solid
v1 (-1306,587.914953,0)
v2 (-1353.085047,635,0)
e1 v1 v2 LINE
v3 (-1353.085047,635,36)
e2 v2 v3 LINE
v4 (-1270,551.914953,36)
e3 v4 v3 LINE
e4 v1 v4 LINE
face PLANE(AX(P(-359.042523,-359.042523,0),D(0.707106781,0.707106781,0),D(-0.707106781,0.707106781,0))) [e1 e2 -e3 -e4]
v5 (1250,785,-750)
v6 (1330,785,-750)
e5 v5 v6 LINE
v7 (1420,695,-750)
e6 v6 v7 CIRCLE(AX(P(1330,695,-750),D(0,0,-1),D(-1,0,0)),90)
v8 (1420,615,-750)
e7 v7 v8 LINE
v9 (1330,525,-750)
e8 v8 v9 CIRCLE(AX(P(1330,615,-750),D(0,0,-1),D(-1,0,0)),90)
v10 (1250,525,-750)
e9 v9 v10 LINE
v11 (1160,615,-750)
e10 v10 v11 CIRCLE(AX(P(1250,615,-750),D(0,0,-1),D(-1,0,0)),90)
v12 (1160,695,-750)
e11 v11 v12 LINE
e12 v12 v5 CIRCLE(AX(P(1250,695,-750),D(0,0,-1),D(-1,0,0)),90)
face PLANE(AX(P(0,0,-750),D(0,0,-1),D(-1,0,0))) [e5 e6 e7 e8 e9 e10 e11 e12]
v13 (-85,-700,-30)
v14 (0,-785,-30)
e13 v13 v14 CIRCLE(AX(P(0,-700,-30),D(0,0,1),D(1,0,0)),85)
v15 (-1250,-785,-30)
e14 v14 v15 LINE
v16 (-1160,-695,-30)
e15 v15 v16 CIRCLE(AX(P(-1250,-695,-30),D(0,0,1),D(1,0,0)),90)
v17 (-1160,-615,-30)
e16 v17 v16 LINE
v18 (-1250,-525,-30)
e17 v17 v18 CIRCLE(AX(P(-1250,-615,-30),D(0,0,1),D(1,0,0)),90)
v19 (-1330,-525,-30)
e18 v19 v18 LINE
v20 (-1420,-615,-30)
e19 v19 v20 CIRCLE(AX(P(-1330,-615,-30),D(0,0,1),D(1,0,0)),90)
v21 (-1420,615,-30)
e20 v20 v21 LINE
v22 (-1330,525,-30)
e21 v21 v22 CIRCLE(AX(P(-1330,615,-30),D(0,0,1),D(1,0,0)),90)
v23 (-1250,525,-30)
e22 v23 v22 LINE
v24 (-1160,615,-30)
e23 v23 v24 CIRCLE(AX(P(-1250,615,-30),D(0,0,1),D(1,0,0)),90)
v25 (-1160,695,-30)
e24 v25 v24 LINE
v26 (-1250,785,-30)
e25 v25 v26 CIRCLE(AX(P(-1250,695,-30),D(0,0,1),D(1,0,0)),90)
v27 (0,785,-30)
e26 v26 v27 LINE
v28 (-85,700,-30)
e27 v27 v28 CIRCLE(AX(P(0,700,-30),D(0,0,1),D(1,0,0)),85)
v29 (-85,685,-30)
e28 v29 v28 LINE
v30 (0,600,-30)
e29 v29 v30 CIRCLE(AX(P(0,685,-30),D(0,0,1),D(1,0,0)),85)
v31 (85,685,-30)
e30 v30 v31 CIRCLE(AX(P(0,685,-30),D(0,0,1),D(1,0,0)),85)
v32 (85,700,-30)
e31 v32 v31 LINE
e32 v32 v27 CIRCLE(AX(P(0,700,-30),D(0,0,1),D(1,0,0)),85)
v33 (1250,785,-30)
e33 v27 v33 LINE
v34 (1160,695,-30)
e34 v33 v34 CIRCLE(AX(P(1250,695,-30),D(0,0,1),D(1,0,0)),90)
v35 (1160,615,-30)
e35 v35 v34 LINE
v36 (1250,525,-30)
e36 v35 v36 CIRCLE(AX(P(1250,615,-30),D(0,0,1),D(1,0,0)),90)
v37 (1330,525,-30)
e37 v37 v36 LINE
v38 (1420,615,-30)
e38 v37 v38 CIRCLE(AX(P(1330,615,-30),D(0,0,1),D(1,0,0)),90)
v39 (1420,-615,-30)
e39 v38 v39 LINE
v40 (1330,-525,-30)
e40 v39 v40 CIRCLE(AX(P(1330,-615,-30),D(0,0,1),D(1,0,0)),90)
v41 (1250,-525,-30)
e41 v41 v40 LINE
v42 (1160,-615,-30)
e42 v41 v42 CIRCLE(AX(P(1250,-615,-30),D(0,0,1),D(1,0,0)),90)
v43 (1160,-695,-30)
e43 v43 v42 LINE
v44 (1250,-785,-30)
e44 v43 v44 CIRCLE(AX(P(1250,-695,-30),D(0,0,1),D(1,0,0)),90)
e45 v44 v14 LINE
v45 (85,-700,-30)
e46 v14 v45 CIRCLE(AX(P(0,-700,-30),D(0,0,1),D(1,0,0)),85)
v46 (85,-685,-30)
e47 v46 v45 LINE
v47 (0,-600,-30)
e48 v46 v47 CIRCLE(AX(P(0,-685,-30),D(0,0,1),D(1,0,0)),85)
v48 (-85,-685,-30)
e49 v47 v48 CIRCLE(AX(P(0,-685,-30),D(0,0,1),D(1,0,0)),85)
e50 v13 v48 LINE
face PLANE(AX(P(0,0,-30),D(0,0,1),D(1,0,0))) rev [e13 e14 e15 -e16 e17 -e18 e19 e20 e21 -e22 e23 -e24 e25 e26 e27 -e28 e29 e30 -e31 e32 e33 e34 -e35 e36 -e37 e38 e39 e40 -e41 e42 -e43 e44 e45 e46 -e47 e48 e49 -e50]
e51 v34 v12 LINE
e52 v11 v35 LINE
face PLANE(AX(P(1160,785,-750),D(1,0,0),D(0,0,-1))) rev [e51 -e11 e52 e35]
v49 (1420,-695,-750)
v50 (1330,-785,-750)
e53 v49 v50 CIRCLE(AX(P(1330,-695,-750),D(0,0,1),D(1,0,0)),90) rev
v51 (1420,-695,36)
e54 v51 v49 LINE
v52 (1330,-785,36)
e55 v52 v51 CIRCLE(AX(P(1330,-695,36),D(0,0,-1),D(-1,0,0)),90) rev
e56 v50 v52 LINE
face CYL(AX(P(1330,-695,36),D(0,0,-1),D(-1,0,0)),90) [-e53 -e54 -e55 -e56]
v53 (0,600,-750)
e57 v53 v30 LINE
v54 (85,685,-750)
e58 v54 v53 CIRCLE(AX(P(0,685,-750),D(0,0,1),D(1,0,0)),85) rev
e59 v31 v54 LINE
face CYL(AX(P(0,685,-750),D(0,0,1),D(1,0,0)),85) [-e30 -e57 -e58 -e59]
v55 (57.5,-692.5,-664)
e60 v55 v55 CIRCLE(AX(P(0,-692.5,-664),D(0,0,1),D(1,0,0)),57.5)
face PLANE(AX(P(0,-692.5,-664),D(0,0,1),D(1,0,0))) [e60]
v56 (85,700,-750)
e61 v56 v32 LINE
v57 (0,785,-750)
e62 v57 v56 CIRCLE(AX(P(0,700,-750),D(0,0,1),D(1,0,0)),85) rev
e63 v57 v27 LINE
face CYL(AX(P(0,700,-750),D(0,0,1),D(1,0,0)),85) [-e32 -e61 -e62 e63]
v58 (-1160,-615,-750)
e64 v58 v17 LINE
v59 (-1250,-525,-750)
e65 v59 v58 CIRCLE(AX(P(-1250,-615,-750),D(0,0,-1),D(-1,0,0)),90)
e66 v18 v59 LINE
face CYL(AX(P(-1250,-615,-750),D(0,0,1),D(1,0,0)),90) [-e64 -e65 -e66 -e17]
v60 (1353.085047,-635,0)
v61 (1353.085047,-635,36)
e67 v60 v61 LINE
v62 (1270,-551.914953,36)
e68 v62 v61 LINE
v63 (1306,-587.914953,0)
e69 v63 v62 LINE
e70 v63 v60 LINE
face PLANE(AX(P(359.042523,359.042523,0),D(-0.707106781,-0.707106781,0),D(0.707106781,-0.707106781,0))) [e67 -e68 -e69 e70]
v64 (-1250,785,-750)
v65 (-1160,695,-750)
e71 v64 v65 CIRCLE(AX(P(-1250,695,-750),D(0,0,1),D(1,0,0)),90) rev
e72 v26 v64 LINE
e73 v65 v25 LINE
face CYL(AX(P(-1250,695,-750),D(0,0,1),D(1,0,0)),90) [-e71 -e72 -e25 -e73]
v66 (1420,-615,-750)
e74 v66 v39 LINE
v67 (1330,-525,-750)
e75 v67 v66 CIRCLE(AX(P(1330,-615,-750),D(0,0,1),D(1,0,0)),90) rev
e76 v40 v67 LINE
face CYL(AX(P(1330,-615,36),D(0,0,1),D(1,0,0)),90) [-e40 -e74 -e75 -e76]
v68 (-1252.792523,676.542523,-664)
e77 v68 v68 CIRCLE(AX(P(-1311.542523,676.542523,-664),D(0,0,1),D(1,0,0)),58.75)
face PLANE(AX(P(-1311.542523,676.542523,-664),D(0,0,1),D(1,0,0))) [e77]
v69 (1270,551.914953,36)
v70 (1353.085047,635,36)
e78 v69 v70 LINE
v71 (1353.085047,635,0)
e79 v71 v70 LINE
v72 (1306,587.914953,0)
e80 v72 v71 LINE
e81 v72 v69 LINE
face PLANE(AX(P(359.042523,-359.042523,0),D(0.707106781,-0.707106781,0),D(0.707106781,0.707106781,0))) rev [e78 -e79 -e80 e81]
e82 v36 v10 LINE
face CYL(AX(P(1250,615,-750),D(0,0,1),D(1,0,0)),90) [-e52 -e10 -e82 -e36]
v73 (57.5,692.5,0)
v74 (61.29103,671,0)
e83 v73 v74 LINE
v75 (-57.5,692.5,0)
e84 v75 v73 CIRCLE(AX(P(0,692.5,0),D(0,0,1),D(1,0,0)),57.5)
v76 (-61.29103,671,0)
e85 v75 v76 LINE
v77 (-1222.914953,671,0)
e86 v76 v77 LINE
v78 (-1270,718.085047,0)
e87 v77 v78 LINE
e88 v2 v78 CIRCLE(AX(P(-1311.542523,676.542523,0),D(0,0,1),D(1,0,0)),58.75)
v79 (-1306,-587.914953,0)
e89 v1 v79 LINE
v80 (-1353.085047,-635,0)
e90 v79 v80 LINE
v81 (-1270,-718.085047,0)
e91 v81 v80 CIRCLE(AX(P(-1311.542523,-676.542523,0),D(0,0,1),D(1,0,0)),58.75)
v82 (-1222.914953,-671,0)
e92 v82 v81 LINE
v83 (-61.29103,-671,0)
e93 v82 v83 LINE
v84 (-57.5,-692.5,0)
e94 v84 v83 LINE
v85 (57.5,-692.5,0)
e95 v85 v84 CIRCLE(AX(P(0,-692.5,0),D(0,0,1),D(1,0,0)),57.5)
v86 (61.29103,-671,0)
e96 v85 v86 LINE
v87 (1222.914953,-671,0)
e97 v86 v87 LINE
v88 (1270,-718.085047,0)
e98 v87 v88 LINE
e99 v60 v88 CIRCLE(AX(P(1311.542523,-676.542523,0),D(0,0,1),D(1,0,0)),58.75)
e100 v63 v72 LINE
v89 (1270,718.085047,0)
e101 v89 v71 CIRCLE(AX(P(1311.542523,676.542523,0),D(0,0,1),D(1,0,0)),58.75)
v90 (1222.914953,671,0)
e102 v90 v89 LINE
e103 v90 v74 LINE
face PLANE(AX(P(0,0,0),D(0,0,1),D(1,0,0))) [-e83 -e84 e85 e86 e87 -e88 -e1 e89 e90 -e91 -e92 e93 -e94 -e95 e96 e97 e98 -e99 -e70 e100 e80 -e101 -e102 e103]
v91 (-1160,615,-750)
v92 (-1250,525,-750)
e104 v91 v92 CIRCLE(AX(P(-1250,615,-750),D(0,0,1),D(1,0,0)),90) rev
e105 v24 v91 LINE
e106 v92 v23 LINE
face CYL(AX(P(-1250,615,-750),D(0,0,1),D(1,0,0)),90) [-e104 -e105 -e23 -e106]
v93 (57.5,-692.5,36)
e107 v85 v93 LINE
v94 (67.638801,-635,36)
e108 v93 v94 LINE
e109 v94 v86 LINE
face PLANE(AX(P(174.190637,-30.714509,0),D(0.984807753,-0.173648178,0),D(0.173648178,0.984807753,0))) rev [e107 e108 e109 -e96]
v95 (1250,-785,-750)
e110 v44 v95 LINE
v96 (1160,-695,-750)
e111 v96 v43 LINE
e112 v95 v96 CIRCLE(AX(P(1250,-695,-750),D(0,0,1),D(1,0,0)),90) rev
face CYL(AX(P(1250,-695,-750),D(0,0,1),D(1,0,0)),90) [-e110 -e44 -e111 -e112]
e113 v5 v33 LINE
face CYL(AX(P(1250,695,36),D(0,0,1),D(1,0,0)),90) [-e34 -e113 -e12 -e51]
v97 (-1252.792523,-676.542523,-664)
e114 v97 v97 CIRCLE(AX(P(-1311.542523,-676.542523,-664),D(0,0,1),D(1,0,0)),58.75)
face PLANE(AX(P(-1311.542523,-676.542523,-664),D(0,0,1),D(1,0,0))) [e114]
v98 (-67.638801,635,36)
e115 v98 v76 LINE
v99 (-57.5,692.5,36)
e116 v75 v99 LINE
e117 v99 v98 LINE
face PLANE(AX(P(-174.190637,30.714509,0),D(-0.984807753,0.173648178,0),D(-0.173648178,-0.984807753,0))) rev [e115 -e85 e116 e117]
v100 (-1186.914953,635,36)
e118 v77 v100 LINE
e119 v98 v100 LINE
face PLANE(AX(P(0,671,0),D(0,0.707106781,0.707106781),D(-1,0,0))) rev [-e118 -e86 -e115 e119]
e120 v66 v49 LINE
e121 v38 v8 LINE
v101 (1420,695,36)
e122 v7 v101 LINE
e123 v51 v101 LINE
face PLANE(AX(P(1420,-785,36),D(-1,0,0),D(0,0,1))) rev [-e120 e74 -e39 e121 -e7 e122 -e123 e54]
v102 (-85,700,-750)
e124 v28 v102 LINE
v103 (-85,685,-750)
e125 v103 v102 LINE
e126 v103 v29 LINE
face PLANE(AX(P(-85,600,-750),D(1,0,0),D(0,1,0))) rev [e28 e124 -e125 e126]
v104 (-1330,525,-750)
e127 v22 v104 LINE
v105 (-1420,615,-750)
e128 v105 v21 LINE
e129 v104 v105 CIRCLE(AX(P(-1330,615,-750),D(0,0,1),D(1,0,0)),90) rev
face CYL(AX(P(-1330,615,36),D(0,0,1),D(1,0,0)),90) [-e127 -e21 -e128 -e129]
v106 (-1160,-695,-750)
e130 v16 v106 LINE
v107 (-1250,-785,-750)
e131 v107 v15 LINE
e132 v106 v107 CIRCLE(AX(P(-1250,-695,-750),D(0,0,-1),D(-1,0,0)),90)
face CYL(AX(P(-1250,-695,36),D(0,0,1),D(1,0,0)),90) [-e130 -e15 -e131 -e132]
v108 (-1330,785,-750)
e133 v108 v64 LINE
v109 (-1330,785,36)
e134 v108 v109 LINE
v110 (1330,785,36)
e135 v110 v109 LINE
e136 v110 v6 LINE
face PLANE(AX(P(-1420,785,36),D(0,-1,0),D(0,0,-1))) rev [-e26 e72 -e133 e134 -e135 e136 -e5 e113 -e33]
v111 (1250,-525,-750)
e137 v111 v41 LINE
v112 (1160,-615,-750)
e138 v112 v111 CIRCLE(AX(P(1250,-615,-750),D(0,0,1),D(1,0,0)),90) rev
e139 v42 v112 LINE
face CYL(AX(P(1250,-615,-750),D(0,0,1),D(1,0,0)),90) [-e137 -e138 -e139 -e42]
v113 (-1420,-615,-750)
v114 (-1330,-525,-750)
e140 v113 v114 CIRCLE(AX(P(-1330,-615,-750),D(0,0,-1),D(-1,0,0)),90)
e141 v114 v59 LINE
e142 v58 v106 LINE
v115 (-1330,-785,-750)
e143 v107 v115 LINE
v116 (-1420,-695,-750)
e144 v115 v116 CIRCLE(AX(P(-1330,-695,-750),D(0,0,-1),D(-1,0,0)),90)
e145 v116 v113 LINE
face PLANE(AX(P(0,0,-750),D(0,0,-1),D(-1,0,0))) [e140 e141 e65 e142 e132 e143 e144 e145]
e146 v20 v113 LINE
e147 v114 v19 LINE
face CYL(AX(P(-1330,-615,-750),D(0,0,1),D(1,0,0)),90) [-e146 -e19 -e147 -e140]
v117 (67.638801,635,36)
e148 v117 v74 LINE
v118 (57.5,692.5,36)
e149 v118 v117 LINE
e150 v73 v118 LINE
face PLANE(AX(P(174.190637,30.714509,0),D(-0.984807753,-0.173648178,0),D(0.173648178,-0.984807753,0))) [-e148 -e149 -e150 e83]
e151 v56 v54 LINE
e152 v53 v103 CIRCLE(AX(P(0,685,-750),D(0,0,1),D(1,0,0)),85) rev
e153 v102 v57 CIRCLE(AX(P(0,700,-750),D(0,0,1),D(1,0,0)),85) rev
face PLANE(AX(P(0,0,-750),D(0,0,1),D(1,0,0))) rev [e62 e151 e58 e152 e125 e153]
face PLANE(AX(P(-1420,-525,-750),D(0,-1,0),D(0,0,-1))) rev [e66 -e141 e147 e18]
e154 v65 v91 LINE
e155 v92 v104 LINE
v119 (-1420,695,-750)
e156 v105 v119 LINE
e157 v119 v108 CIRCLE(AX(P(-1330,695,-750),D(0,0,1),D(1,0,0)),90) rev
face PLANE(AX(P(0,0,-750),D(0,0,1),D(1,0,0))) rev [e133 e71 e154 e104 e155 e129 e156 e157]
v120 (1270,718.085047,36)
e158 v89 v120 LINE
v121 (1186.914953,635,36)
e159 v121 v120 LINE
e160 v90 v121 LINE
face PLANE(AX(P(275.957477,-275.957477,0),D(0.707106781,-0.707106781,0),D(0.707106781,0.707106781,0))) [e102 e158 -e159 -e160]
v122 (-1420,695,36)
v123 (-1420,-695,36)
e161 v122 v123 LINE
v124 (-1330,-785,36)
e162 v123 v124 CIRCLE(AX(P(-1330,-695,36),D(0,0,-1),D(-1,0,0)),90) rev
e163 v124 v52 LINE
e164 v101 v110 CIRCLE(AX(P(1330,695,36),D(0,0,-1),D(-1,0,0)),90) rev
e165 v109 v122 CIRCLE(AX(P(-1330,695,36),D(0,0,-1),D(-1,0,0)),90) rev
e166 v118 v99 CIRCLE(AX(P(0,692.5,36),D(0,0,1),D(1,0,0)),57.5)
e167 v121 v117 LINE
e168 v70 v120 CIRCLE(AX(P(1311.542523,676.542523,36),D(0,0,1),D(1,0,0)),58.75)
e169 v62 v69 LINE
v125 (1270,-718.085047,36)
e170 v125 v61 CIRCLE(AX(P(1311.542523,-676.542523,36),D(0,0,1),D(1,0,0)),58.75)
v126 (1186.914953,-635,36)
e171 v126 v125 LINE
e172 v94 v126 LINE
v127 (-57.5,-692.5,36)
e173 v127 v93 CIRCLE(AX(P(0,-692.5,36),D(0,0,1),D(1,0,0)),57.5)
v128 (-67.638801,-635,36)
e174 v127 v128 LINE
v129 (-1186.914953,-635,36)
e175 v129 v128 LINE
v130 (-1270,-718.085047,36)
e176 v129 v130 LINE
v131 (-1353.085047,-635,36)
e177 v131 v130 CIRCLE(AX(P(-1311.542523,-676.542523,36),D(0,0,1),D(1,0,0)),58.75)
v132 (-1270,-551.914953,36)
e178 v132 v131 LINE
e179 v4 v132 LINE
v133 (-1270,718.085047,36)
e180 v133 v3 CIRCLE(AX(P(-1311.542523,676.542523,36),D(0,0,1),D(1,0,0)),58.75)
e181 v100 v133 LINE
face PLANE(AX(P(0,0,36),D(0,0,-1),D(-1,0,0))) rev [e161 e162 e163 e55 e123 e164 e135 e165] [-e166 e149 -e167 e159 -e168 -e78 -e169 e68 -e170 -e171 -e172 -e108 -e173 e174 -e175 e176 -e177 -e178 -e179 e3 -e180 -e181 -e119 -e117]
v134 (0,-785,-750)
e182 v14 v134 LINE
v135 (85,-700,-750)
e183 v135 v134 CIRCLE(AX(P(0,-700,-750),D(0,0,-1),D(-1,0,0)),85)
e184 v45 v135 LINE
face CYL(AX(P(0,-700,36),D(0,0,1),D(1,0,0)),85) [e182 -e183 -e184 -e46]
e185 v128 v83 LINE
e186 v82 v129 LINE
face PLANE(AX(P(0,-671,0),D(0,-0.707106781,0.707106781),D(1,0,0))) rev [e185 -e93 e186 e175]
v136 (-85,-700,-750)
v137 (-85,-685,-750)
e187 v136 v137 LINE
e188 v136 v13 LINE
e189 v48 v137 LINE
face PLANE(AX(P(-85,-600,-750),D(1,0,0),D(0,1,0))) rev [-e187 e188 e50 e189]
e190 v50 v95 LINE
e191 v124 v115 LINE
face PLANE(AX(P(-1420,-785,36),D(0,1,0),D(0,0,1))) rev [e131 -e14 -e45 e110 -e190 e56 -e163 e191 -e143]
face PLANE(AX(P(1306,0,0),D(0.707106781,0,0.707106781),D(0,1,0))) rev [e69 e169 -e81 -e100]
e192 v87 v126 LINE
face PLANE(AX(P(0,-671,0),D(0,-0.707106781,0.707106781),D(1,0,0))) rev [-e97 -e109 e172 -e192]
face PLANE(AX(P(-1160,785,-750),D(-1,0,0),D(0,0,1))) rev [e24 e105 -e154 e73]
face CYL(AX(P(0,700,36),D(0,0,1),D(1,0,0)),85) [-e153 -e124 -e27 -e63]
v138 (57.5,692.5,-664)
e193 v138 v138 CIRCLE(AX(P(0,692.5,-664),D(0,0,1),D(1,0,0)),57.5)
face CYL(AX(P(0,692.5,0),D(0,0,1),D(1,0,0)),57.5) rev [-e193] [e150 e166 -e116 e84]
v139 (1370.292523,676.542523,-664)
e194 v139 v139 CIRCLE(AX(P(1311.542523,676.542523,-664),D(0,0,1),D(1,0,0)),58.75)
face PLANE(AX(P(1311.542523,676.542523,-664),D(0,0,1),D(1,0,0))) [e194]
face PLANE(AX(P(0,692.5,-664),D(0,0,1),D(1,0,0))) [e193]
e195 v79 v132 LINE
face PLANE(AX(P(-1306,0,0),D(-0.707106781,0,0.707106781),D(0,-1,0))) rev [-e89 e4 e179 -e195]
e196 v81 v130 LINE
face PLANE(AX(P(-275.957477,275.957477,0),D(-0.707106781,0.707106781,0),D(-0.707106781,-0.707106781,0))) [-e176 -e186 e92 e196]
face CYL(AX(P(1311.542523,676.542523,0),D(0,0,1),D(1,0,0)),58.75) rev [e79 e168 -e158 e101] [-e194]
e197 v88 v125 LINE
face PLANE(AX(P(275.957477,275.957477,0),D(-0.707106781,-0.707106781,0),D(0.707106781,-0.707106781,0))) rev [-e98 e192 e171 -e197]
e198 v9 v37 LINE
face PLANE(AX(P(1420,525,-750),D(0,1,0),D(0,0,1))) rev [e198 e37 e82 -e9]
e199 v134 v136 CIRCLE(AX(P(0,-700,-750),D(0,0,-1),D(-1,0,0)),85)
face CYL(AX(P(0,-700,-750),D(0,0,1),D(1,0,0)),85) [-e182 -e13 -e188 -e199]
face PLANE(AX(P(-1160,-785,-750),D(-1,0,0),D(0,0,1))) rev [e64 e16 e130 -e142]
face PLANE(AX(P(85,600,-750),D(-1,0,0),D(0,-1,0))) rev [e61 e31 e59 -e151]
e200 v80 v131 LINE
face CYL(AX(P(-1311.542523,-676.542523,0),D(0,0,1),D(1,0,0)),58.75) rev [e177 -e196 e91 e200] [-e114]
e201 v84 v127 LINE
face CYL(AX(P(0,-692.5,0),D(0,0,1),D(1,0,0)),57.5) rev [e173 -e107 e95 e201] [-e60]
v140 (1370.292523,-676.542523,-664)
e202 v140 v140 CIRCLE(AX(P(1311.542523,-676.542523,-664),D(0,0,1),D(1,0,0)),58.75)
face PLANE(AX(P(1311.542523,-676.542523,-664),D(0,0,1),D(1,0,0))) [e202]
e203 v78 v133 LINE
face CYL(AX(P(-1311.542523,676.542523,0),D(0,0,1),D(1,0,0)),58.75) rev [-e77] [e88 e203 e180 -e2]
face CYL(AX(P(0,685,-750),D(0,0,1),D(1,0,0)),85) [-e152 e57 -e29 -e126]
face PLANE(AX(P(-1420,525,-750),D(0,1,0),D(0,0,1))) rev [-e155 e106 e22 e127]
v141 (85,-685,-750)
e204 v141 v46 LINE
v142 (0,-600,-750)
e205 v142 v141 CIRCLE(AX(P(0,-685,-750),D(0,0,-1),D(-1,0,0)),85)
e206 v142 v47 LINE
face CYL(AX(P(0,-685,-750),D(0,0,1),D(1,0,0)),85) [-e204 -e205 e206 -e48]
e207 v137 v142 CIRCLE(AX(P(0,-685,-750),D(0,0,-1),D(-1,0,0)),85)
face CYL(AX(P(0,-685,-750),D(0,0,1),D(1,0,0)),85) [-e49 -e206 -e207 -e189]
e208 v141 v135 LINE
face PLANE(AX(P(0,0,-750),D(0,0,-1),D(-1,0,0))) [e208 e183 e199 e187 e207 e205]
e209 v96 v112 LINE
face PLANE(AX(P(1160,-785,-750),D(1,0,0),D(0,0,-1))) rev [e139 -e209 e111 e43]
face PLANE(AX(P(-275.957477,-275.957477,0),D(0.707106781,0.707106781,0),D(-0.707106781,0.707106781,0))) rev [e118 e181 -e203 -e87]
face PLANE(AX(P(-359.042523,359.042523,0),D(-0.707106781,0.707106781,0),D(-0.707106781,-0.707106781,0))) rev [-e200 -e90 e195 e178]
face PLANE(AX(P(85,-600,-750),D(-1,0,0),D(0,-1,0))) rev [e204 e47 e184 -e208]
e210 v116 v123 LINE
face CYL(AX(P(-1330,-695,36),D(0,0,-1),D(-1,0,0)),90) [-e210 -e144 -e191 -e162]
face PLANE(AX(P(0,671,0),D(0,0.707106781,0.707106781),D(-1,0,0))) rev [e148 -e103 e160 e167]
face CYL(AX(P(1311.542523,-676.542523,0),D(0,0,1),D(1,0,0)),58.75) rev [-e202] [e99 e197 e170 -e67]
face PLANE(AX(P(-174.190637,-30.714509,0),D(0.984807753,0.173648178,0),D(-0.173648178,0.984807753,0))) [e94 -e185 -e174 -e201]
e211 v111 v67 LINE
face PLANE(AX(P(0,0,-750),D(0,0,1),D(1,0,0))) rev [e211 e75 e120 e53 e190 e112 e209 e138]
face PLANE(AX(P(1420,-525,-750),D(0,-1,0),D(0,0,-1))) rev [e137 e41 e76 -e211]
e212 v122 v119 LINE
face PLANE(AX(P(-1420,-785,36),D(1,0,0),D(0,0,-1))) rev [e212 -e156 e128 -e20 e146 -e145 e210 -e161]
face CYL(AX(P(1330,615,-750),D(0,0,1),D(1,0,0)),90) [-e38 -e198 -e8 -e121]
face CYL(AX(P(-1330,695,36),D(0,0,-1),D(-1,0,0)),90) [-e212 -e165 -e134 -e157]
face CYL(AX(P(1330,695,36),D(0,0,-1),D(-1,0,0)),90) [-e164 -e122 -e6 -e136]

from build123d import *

# Parameters (mm, degrees)
SZKIC1_W                    = 2840
SZKIC1_H                    = 1570
SZKIC1_W_2                  = 2540
SZKIC1_H_2                  = 1270
DODANIE_WYCI_GNI_CIE1_DEPTH = 36
SFAZOWANIE1_SIZE            = 36
SZKIC3_W                    = 2840
SZKIC3_H                    = 1570
DODANIE_WYCI_GNI_CIE3_DEPTH = 30
SZKIC5_W                    = 260
SZKIC5_H                    = 260
DODANIE_WYCI_GNI_CIE4_DEPTH = 720
WYTNIJ_WYCI_GNI_CIE16_DEPTH = 36
SZKIC8_R                    = 58.75
WYTNIJ_WYCI_GNI_CIE17_DEPTH = 700
ZAOKR_GLENIE1_R             = 90
WYTNIJ_WYCI_GNI_CIE18_DEPTH = 36
SZKIC11_W                   = 170
SZKIC11_H                   = 185
DODANIE_WYCI_GNI_CIE5_DEPTH = 720
ZAOKR_GLENIE2_R             = 85
SZKIC10_R                   = 57.5
WYTNIJ_WYCI_GNI_CIE19_DEPTH = 700


with BuildPart() as part:
    # Szkic1 → Dodanie-wyciągnięcie1 (new body)
    with BuildSketch(Plane.XY):
        Rectangle(SZKIC1_W, SZKIC1_H)
        Rectangle(SZKIC1_W_2, SZKIC1_H_2, mode=Mode.SUBTRACT)
    extrude(amount=DODANIE_WYCI_GNI_CIE1_DEPTH)

    # Sfazowanie1
    sfazowanie1_edges = [part.edges().sort_by_distance(p)[0] for p in [
        (-1270, 0, 0),
        (0, -635, 0),
        (1270, 0, 0),
        (0, 635, 0),
    ]]
    chamfer(sfazowanie1_edges, length=SFAZOWANIE1_SIZE - 0.0001)  # a hair under: the kernel refuses the full size

    # Szkic3 → Dodanie-wyciągnięcie3 (add)
    with BuildSketch(Plane(origin=(0, 0, 0), x_dir=(-1, 0, 0), z_dir=(0, 0, -1))):
        Rectangle(SZKIC3_W, SZKIC3_H)
    extrude(amount=DODANIE_WYCI_GNI_CIE3_DEPTH)

    # Szkic5 → Dodanie-wyciągnięcie4 (add)
    with BuildSketch(Plane(origin=(0, 0, -30), x_dir=(-1, 0, 0), z_dir=(0, 0, -1))):
        with Locations((-1290, 655)):
            Rectangle(SZKIC5_W, SZKIC5_H)
        with Locations((1290, 655)):
            Rectangle(SZKIC5_W, SZKIC5_H)
        with Locations((1290, -655)):
            Rectangle(SZKIC5_W, SZKIC5_H)
        with Locations((-1290, -655)):
            Rectangle(SZKIC5_W, SZKIC5_H)
    extrude(amount=DODANIE_WYCI_GNI_CIE4_DEPTH)

    # Szkic4 → Wytnij-wyciągnięcie16 (cut)
    with BuildSketch(Plane.XY.offset(36)):
        with BuildLine():
            Line((-1270, 635), (-1186.914953211, 635))
            Line((-1186.914953211, 635), (-1270, 718.085046789))
            ThreePointArc((-1270, 718.085046789), (-1353.085046789, 718.085046789), (-1353.085046789, 635))
            Line((-1353.085046789, 635), (-1270, 551.914953211))
            Line((-1270, 551.914953211), (-1270, 635))
        make_face()
        with BuildLine():
            Line((1270, 718.085046789), (1186.914953211, 635))
            Line((1186.914953211, 635), (1270, 635))
            Line((1270, 635), (1270, 551.914953211))
            Line((1270, 551.914953211), (1353.085046789, 635))
            ThreePointArc((1353.085046789, 635), (1353.085046789, 718.085046789), (1270, 718.085046789))
        make_face()
        with BuildLine():
            Line((-1270, -635), (-1270, -551.914953211))
            Line((-1270, -551.914953211), (-1353.085046789, -635))
            ThreePointArc((-1353.085046789, -635), (-1353.085046789, -718.085046789), (-1270, -718.085046789))
            Line((-1270, -718.085046789), (-1186.914953211, -635))
            Line((-1186.914953211, -635), (-1270, -635))
        make_face()
        with BuildLine():
            Line((1353.085046789, -635), (1270, -551.914953211))
            Line((1270, -551.914953211), (1270, -635))
            Line((1270, -635), (1186.914953211, -635))
            Line((1186.914953211, -635), (1270, -718.085046789))
            ThreePointArc((1270, -718.085046789), (1353.085046789, -718.085046789), (1353.085046789, -635))
        make_face()
    extrude(amount=-WYTNIJ_WYCI_GNI_CIE16_DEPTH, mode=Mode.SUBTRACT)

    # Szkic8 → Wytnij-wyciągnięcie17 (cut)
    with BuildSketch(Plane.XY.offset(36)):
        with Locations((-1311.542523395, -676.542523395)):
            Circle(SZKIC8_R)
        with Locations((-1311.542523395, 676.542523395)):
            Circle(SZKIC8_R)
        with Locations((1311.542523395, 676.542523395)):
            Circle(SZKIC8_R)
        with Locations((1311.542523395, -676.542523395)):
            Circle(SZKIC8_R)
    extrude(amount=-WYTNIJ_WYCI_GNI_CIE17_DEPTH, mode=Mode.SUBTRACT)

    # Zaokrąglenie1
    zaokr_glenie1_edges = [part.edges().sort_by_distance(p)[0] for p in [
        (-1160, 525, -390),
        (-1160, -785, -390),
        (-1420, -785, -357),
        (-1160, -525, -390),
        (-1420, -525, -390),
        (-1420, 525, -390),
        (-1160, 785, -390),
        (-1420, 785, -357),
        (1160, -525, -390),
        (1420, -525, -390),
        (1420, -785, -357),
        (1160, -785, -390),
        (1160, 525, -390),
        (1160, 785, -390),
        (1420, 525, -390),
        (1420, 785, -357),
    ]]
    fillet(zaokr_glenie1_edges, radius=ZAOKR_GLENIE1_R)

    # Szkic9 → Wytnij-wyciągnięcie18 (cut)
    with BuildSketch(Plane.XY.offset(36)):
        with BuildLine():
            Line((-67.638801391, 635), (67.638801391, 635))
            Line((67.638801391, 635), (57.5, 692.5))
            ThreePointArc((57.5, 692.5), (0, 750), (-57.5, 692.5))
            Line((-57.5, 692.5), (-67.638801391, 635))
        make_face()
        with BuildLine():
            Line((-67.638801391, -635), (-57.5, -692.5))
            ThreePointArc((-57.5, -692.5), (0, -750), (57.5, -692.5))
            Line((57.5, -692.5), (67.638801391, -635))
            Line((67.638801391, -635), (-67.638801391, -635))
        make_face()
    extrude(amount=-WYTNIJ_WYCI_GNI_CIE18_DEPTH, mode=Mode.SUBTRACT)

    # Szkic11 → Dodanie-wyciągnięcie5 (add)
    with BuildSketch(Plane(origin=(0, 0, -30), x_dir=(-1, 0, 0), z_dir=(0, 0, -1))):
        with Locations((0, 692.5)):
            Rectangle(SZKIC11_W, SZKIC11_H)
        with Locations((0, -692.5)):
            Rectangle(SZKIC11_W, SZKIC11_H)
    extrude(amount=DODANIE_WYCI_GNI_CIE5_DEPTH)

    # Zaokrąglenie2
    zaokr_glenie2_edges = [part.edges().sort_by_distance(p)[0] for p in [
        (85, -785, -390),
        (85, -600, -390),
        (-85, -600, -390),
        (-85, -785, -390),
        (-85, 600, -390),
        (85, 600, -390),
        (85, 785, -390),
        (-85, 785, -390),
    ]]
    fillet(zaokr_glenie2_edges, radius=ZAOKR_GLENIE2_R - 0.0001)  # a hair under: the kernel refuses the full size

    # Szkic10 → Wytnij-wyciągnięcie19 (cut)
    with BuildSketch(Plane.XY.offset(36)):
        with Locations((0, 692.5)):
            Circle(SZKIC10_R)
        with Locations((0, -692.5)):
            Circle(SZKIC10_R)
    extrude(amount=-WYTNIJ_WYCI_GNI_CIE19_DEPTH, mode=Mode.SUBTRACT)


solid = part.part
